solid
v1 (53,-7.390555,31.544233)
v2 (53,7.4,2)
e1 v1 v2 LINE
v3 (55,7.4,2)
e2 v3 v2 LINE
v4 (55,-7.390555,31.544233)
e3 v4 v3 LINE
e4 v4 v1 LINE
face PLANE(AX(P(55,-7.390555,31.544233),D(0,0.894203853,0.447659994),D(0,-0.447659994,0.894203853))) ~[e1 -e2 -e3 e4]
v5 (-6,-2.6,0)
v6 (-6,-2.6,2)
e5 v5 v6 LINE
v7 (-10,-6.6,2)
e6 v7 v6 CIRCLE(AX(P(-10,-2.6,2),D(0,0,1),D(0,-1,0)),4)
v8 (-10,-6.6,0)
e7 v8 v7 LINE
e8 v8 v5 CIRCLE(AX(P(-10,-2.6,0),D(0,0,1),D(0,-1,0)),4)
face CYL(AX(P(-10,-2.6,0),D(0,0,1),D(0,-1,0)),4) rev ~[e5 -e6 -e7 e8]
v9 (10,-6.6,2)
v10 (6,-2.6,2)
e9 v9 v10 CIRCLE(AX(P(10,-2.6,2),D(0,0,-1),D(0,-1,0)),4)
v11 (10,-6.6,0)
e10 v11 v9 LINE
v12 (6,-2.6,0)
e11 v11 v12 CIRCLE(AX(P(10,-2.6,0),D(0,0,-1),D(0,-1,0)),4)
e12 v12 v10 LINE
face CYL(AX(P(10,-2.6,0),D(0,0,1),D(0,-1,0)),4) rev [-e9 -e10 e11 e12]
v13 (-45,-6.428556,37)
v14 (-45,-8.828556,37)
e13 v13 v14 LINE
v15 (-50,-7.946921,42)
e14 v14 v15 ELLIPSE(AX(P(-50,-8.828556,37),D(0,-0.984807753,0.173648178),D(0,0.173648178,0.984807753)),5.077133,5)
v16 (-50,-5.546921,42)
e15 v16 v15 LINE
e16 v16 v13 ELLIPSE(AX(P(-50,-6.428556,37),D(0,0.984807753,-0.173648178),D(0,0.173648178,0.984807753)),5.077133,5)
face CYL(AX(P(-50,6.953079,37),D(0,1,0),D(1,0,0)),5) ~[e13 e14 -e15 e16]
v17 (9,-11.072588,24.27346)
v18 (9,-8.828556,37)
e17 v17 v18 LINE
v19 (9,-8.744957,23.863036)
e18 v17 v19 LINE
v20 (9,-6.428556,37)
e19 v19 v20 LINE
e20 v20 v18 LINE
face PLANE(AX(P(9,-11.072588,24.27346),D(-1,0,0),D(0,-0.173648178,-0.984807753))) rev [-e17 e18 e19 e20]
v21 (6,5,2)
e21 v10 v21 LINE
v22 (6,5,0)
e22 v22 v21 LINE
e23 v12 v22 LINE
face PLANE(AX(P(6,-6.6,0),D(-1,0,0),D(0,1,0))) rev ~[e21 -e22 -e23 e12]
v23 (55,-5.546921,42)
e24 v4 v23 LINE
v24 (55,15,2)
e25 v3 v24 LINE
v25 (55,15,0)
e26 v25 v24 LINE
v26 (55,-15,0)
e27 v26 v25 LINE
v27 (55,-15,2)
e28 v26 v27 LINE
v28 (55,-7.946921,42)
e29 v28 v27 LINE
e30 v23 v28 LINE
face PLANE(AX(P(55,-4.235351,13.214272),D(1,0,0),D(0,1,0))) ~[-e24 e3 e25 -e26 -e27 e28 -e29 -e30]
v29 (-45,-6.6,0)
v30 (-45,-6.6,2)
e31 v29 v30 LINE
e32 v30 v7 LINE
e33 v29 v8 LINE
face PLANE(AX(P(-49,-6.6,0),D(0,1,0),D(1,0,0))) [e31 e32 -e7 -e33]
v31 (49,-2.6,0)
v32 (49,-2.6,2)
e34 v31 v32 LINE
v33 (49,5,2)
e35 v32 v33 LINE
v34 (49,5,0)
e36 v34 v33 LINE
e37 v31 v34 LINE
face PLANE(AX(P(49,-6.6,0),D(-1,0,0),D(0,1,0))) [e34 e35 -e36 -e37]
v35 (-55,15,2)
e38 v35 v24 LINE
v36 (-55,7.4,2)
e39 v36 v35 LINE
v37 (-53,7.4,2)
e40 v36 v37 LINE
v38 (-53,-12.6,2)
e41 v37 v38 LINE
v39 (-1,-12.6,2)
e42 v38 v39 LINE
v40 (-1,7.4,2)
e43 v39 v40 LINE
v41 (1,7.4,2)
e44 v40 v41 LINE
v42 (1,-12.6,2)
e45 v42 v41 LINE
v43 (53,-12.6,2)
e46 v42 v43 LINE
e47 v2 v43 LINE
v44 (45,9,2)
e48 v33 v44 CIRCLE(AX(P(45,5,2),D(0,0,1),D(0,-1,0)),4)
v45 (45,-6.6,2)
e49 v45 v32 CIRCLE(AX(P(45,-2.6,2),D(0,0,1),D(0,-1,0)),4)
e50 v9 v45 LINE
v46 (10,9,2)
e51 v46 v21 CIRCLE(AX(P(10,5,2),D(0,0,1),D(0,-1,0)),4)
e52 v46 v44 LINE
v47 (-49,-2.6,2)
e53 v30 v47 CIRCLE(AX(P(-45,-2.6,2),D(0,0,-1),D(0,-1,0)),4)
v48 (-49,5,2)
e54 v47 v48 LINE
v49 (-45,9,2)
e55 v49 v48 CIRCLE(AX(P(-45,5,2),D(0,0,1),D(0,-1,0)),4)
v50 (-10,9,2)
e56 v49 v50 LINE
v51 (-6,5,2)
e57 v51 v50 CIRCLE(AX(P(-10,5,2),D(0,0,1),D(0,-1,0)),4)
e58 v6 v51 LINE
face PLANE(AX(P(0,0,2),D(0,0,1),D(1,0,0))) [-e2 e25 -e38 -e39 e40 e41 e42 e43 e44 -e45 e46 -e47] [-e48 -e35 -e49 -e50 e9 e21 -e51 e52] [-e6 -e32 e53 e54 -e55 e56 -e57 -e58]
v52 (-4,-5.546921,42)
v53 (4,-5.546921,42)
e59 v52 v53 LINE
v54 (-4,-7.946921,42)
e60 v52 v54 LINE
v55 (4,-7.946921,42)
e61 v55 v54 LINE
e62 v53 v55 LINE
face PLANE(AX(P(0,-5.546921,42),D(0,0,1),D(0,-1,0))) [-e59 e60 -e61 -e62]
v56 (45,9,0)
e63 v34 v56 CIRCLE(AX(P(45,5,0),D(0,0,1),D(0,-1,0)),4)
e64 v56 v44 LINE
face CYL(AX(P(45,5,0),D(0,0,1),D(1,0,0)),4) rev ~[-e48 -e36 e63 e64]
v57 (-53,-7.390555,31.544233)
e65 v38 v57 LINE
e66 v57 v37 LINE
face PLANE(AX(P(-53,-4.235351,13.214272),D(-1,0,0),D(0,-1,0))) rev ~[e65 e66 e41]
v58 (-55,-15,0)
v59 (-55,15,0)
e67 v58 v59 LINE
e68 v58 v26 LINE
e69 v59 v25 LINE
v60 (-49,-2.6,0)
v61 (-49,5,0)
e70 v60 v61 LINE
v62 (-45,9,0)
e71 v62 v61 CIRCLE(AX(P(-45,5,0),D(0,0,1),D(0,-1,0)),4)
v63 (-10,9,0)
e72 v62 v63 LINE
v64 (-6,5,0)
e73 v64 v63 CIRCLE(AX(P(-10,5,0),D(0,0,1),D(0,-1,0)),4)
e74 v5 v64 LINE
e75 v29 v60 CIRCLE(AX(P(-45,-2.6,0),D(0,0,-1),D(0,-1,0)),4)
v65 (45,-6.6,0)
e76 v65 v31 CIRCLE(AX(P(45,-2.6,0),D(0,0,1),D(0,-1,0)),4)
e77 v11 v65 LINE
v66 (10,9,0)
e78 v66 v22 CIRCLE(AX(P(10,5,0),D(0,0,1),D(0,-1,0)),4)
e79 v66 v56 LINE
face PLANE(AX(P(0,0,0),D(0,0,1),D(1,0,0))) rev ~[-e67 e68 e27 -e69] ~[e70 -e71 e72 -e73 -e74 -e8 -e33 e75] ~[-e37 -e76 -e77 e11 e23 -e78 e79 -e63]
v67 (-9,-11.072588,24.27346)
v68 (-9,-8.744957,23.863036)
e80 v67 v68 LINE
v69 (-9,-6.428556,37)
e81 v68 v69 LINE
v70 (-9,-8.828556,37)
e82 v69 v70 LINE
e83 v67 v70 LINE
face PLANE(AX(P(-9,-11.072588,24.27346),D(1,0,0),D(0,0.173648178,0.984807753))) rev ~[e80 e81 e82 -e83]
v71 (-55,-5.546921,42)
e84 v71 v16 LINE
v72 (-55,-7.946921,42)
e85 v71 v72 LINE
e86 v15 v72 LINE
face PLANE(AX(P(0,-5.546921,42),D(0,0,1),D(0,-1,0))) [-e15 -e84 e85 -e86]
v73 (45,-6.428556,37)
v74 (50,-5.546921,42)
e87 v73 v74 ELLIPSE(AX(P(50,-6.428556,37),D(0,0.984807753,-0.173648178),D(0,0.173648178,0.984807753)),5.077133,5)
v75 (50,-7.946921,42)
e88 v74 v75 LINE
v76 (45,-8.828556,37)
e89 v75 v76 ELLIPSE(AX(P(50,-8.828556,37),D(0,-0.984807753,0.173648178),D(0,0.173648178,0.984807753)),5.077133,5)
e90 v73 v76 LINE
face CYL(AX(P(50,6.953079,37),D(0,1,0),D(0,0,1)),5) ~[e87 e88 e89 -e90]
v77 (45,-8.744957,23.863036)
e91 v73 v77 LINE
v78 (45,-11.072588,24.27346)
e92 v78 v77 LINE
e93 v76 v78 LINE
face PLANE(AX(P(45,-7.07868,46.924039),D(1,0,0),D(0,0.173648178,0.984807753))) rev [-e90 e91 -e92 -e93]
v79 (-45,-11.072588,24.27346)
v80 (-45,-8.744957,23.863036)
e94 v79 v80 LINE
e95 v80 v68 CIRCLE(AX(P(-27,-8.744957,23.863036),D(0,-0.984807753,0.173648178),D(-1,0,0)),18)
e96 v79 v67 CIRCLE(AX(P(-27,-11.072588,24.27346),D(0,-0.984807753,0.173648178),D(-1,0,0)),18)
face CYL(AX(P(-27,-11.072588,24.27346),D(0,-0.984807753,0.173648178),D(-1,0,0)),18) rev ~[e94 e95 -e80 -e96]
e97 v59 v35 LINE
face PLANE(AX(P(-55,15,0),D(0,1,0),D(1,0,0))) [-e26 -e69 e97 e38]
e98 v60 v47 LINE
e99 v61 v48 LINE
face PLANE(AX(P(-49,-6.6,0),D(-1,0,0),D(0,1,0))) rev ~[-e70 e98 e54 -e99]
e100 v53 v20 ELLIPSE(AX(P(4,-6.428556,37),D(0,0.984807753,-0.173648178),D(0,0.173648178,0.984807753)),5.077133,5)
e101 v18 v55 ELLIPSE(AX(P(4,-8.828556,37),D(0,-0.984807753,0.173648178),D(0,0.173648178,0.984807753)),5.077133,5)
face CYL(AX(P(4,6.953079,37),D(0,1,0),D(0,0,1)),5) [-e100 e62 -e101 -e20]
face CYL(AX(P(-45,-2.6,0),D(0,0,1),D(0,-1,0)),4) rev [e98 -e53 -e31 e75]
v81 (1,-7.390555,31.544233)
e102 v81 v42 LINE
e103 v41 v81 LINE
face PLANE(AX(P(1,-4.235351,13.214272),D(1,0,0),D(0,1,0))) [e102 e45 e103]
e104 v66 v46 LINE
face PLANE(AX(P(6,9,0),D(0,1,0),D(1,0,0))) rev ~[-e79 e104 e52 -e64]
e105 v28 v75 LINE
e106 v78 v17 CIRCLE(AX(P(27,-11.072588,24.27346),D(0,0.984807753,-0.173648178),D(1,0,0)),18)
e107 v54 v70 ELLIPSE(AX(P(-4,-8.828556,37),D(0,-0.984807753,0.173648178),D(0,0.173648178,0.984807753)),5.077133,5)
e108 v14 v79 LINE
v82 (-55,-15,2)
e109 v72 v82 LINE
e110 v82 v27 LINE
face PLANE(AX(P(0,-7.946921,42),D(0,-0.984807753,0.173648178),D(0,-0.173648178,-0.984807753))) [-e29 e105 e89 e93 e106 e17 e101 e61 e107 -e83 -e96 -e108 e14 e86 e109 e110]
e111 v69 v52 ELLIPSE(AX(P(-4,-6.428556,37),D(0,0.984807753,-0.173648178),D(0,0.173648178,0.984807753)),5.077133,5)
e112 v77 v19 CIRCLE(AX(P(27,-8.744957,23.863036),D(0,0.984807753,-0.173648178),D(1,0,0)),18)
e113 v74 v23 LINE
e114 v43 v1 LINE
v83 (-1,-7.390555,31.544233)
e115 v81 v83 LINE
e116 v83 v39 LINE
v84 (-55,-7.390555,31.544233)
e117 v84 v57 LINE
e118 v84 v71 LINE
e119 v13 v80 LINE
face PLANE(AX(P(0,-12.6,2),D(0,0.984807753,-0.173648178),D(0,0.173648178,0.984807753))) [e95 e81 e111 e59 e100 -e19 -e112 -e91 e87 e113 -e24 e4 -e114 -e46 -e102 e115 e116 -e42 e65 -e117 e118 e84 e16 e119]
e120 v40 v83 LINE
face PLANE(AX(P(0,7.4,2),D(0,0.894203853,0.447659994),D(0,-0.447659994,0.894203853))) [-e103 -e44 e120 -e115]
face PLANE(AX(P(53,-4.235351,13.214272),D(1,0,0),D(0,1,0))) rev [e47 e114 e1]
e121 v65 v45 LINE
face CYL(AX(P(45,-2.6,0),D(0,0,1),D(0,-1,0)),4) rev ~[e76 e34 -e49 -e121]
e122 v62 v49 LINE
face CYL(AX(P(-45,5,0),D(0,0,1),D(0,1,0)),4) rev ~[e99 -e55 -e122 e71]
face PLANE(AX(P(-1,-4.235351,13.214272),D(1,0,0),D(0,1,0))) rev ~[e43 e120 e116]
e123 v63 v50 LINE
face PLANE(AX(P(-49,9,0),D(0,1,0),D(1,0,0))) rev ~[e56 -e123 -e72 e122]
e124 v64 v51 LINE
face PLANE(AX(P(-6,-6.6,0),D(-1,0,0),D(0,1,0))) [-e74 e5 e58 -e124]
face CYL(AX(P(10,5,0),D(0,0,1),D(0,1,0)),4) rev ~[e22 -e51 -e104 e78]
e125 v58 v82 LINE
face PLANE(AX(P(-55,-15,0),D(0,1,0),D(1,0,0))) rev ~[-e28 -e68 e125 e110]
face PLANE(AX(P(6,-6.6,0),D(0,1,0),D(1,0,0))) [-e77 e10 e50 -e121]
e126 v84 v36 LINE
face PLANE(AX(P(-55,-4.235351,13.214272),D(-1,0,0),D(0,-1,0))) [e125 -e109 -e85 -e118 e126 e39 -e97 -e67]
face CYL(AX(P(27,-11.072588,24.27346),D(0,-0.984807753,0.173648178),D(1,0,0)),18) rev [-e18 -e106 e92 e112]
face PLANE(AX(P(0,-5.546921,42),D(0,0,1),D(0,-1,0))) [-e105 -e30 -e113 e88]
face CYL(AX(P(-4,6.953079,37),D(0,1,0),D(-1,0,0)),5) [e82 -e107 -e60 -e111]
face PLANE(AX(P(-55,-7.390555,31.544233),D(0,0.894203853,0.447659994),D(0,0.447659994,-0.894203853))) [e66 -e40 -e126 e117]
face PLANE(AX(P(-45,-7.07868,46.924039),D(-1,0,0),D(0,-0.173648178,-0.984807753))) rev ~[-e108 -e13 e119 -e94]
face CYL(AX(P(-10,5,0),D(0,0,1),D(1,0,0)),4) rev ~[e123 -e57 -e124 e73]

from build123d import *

# Parameters (mm, degrees)
F0_W         = 110
F0_H         = 30
F1_DEPTH     = 2
F3_DEPTH     = 55
F5_DEPTH     = 2.3635386072
F7_DEPTH     = 2
F9_DEPTH     = 1
F10_W        = 43
F10_H        = 15.6
F11_DEPTH    = 2
F12_T1_DEPTH = 27.4
F13_R        = 4


# Not quite as in the source:
# - a fillet or chamfer that OpenCascade refuses, or shapes differently, is made with other operations: its cross-section is extruded or revolved along the edge and cut away or added
# - a pattern or mirror of a feature is missing from the dataset's text; its kind, count and spacing are read off the source's solid


with BuildPart() as f1:
    # F0 (on Top) → F1 (new body)
    with BuildSketch(Plane.XY):
        Rectangle(F0_W, F0_H)
    extrude(amount=F1_DEPTH)

    # F2 (on Right) → F3 (join, symmetric)
    with BuildSketch(Plane.YZ):
        Polygon((-15, 2), (-12.6, 2), (-5.5469207717, 42), (-7.9469207717, 42), align=None)
    extrude(amount=F3_DEPTH, both=True)

    # F4 (on face) → F5 (cut, through all)
    with BuildSketch(Plane(origin=(0, -14.8897147992, 2.6254584542), x_dir=(1, 0, 0), z_dir=(0, -0.984807753, 0.1736481777))):
        with BuildLine():
            Line((-9, 21.9819573165), (-9, 39.9819573165))
            Line((-9, 39.9819573165), (-9, 44.9819573165))
            Line((-9, 44.9819573165), (-45, 44.9819573165))
            Line((-45, 44.9819573165), (-45, 39.9819573165))
            Line((-45, 39.9819573165), (-45, 21.9819573165))
            ThreePointArc((-45, 21.9819573165), (-27, 3.9819573165), (-9, 21.9819573165))
        make_face()
    f5 = extrude(amount=-F5_DEPTH, mode=Mode.SUBTRACT)

    # F5_copies: F5 across plane
    add(f5.mirror(Plane(origin=(0, 0, 0), x_dir=(0, 0, 1), z_dir=(1, 0, 0))), mode=Mode.SUBTRACT)

    # F6 (on face) → F7 (join)
    with BuildSketch(Plane(origin=(-55, 0, 0), x_dir=(0, -1, 0), z_dir=(-1, 0, 0))):
        Polygon((7.39055467, 31.5442325904), (-7.4, 2), (12.6, 2), align=None)
    f7 = extrude(amount=-F7_DEPTH)

    # F7_copies: F7 across plane
    add(f7.mirror(Plane(origin=(0, 0, 0), x_dir=(0, 0, 1), z_dir=(1, 0, 0))))

    # F8 (on Right) → F9 (join, symmetric)
    with BuildSketch(Plane.YZ):
        Polygon((-12.6, 2), (7.4, 2), (-7.39055467, 31.5442325904), align=None)
    extrude(amount=F9_DEPTH, both=True)

    # F10 (on Top) → F11 (cut, through all)
    with BuildSketch(Plane.XY):
        with Locations((27.5, 1.2)):
            Rectangle(F10_W, F10_H)
        with Locations((-27.5, 1.2)):
            Rectangle(F10_W, F10_H)
    extrude(amount=F11_DEPTH, mode=Mode.SUBTRACT)

    # F12: fillet of radius 5 on 6 edges, made by hand

    # F12_s2 → F12_t1 (cut)
    with BuildSketch(Plane.XZ.offset(-6.9530792283)):
        with BuildLine():
            ThreePointArc((50, 42), (46.4644660941, 40.5355339059), (45, 37))
            Line((45, 37), (45, 42))
            Line((45, 42), (50, 42))
        make_face()
        with BuildLine():
            ThreePointArc((-45, 37), (-46.4644660941, 40.5355339059), (-50, 42))
            Line((-50, 42), (-45, 42))
            Line((-45, 42), (-45, 37))
        make_face()
        with BuildLine():
            ThreePointArc((-9, 37), (-7.5355339059, 40.5355339059), (-4, 42))
            Line((-4, 42), (-9, 42))
            Line((-9, 42), (-9, 37))
        make_face()
        with BuildLine():
            ThreePointArc((4, 42), (7.5355339059, 40.5355339059), (9, 37))
            Line((9, 37), (9, 42))
            Line((9, 42), (4, 42))
        make_face()
    extrude(amount=F12_T1_DEPTH, mode=Mode.SUBTRACT)

    # F13
    f13_edges = [f1.edges().sort_by_distance(p)[0] for p in [
        (-49, -6.6, 1),
        (49, -6.6, 1),
        (-6, -6.6, 1),
        (6, -6.6, 1),
        (6, 9, 1),
        (-49, 9, 1),
        (49, 9, 1),
        (-6, 9, 1),
    ]]
    fillet(f13_edges, radius=F13_R)


solid = f1.part
